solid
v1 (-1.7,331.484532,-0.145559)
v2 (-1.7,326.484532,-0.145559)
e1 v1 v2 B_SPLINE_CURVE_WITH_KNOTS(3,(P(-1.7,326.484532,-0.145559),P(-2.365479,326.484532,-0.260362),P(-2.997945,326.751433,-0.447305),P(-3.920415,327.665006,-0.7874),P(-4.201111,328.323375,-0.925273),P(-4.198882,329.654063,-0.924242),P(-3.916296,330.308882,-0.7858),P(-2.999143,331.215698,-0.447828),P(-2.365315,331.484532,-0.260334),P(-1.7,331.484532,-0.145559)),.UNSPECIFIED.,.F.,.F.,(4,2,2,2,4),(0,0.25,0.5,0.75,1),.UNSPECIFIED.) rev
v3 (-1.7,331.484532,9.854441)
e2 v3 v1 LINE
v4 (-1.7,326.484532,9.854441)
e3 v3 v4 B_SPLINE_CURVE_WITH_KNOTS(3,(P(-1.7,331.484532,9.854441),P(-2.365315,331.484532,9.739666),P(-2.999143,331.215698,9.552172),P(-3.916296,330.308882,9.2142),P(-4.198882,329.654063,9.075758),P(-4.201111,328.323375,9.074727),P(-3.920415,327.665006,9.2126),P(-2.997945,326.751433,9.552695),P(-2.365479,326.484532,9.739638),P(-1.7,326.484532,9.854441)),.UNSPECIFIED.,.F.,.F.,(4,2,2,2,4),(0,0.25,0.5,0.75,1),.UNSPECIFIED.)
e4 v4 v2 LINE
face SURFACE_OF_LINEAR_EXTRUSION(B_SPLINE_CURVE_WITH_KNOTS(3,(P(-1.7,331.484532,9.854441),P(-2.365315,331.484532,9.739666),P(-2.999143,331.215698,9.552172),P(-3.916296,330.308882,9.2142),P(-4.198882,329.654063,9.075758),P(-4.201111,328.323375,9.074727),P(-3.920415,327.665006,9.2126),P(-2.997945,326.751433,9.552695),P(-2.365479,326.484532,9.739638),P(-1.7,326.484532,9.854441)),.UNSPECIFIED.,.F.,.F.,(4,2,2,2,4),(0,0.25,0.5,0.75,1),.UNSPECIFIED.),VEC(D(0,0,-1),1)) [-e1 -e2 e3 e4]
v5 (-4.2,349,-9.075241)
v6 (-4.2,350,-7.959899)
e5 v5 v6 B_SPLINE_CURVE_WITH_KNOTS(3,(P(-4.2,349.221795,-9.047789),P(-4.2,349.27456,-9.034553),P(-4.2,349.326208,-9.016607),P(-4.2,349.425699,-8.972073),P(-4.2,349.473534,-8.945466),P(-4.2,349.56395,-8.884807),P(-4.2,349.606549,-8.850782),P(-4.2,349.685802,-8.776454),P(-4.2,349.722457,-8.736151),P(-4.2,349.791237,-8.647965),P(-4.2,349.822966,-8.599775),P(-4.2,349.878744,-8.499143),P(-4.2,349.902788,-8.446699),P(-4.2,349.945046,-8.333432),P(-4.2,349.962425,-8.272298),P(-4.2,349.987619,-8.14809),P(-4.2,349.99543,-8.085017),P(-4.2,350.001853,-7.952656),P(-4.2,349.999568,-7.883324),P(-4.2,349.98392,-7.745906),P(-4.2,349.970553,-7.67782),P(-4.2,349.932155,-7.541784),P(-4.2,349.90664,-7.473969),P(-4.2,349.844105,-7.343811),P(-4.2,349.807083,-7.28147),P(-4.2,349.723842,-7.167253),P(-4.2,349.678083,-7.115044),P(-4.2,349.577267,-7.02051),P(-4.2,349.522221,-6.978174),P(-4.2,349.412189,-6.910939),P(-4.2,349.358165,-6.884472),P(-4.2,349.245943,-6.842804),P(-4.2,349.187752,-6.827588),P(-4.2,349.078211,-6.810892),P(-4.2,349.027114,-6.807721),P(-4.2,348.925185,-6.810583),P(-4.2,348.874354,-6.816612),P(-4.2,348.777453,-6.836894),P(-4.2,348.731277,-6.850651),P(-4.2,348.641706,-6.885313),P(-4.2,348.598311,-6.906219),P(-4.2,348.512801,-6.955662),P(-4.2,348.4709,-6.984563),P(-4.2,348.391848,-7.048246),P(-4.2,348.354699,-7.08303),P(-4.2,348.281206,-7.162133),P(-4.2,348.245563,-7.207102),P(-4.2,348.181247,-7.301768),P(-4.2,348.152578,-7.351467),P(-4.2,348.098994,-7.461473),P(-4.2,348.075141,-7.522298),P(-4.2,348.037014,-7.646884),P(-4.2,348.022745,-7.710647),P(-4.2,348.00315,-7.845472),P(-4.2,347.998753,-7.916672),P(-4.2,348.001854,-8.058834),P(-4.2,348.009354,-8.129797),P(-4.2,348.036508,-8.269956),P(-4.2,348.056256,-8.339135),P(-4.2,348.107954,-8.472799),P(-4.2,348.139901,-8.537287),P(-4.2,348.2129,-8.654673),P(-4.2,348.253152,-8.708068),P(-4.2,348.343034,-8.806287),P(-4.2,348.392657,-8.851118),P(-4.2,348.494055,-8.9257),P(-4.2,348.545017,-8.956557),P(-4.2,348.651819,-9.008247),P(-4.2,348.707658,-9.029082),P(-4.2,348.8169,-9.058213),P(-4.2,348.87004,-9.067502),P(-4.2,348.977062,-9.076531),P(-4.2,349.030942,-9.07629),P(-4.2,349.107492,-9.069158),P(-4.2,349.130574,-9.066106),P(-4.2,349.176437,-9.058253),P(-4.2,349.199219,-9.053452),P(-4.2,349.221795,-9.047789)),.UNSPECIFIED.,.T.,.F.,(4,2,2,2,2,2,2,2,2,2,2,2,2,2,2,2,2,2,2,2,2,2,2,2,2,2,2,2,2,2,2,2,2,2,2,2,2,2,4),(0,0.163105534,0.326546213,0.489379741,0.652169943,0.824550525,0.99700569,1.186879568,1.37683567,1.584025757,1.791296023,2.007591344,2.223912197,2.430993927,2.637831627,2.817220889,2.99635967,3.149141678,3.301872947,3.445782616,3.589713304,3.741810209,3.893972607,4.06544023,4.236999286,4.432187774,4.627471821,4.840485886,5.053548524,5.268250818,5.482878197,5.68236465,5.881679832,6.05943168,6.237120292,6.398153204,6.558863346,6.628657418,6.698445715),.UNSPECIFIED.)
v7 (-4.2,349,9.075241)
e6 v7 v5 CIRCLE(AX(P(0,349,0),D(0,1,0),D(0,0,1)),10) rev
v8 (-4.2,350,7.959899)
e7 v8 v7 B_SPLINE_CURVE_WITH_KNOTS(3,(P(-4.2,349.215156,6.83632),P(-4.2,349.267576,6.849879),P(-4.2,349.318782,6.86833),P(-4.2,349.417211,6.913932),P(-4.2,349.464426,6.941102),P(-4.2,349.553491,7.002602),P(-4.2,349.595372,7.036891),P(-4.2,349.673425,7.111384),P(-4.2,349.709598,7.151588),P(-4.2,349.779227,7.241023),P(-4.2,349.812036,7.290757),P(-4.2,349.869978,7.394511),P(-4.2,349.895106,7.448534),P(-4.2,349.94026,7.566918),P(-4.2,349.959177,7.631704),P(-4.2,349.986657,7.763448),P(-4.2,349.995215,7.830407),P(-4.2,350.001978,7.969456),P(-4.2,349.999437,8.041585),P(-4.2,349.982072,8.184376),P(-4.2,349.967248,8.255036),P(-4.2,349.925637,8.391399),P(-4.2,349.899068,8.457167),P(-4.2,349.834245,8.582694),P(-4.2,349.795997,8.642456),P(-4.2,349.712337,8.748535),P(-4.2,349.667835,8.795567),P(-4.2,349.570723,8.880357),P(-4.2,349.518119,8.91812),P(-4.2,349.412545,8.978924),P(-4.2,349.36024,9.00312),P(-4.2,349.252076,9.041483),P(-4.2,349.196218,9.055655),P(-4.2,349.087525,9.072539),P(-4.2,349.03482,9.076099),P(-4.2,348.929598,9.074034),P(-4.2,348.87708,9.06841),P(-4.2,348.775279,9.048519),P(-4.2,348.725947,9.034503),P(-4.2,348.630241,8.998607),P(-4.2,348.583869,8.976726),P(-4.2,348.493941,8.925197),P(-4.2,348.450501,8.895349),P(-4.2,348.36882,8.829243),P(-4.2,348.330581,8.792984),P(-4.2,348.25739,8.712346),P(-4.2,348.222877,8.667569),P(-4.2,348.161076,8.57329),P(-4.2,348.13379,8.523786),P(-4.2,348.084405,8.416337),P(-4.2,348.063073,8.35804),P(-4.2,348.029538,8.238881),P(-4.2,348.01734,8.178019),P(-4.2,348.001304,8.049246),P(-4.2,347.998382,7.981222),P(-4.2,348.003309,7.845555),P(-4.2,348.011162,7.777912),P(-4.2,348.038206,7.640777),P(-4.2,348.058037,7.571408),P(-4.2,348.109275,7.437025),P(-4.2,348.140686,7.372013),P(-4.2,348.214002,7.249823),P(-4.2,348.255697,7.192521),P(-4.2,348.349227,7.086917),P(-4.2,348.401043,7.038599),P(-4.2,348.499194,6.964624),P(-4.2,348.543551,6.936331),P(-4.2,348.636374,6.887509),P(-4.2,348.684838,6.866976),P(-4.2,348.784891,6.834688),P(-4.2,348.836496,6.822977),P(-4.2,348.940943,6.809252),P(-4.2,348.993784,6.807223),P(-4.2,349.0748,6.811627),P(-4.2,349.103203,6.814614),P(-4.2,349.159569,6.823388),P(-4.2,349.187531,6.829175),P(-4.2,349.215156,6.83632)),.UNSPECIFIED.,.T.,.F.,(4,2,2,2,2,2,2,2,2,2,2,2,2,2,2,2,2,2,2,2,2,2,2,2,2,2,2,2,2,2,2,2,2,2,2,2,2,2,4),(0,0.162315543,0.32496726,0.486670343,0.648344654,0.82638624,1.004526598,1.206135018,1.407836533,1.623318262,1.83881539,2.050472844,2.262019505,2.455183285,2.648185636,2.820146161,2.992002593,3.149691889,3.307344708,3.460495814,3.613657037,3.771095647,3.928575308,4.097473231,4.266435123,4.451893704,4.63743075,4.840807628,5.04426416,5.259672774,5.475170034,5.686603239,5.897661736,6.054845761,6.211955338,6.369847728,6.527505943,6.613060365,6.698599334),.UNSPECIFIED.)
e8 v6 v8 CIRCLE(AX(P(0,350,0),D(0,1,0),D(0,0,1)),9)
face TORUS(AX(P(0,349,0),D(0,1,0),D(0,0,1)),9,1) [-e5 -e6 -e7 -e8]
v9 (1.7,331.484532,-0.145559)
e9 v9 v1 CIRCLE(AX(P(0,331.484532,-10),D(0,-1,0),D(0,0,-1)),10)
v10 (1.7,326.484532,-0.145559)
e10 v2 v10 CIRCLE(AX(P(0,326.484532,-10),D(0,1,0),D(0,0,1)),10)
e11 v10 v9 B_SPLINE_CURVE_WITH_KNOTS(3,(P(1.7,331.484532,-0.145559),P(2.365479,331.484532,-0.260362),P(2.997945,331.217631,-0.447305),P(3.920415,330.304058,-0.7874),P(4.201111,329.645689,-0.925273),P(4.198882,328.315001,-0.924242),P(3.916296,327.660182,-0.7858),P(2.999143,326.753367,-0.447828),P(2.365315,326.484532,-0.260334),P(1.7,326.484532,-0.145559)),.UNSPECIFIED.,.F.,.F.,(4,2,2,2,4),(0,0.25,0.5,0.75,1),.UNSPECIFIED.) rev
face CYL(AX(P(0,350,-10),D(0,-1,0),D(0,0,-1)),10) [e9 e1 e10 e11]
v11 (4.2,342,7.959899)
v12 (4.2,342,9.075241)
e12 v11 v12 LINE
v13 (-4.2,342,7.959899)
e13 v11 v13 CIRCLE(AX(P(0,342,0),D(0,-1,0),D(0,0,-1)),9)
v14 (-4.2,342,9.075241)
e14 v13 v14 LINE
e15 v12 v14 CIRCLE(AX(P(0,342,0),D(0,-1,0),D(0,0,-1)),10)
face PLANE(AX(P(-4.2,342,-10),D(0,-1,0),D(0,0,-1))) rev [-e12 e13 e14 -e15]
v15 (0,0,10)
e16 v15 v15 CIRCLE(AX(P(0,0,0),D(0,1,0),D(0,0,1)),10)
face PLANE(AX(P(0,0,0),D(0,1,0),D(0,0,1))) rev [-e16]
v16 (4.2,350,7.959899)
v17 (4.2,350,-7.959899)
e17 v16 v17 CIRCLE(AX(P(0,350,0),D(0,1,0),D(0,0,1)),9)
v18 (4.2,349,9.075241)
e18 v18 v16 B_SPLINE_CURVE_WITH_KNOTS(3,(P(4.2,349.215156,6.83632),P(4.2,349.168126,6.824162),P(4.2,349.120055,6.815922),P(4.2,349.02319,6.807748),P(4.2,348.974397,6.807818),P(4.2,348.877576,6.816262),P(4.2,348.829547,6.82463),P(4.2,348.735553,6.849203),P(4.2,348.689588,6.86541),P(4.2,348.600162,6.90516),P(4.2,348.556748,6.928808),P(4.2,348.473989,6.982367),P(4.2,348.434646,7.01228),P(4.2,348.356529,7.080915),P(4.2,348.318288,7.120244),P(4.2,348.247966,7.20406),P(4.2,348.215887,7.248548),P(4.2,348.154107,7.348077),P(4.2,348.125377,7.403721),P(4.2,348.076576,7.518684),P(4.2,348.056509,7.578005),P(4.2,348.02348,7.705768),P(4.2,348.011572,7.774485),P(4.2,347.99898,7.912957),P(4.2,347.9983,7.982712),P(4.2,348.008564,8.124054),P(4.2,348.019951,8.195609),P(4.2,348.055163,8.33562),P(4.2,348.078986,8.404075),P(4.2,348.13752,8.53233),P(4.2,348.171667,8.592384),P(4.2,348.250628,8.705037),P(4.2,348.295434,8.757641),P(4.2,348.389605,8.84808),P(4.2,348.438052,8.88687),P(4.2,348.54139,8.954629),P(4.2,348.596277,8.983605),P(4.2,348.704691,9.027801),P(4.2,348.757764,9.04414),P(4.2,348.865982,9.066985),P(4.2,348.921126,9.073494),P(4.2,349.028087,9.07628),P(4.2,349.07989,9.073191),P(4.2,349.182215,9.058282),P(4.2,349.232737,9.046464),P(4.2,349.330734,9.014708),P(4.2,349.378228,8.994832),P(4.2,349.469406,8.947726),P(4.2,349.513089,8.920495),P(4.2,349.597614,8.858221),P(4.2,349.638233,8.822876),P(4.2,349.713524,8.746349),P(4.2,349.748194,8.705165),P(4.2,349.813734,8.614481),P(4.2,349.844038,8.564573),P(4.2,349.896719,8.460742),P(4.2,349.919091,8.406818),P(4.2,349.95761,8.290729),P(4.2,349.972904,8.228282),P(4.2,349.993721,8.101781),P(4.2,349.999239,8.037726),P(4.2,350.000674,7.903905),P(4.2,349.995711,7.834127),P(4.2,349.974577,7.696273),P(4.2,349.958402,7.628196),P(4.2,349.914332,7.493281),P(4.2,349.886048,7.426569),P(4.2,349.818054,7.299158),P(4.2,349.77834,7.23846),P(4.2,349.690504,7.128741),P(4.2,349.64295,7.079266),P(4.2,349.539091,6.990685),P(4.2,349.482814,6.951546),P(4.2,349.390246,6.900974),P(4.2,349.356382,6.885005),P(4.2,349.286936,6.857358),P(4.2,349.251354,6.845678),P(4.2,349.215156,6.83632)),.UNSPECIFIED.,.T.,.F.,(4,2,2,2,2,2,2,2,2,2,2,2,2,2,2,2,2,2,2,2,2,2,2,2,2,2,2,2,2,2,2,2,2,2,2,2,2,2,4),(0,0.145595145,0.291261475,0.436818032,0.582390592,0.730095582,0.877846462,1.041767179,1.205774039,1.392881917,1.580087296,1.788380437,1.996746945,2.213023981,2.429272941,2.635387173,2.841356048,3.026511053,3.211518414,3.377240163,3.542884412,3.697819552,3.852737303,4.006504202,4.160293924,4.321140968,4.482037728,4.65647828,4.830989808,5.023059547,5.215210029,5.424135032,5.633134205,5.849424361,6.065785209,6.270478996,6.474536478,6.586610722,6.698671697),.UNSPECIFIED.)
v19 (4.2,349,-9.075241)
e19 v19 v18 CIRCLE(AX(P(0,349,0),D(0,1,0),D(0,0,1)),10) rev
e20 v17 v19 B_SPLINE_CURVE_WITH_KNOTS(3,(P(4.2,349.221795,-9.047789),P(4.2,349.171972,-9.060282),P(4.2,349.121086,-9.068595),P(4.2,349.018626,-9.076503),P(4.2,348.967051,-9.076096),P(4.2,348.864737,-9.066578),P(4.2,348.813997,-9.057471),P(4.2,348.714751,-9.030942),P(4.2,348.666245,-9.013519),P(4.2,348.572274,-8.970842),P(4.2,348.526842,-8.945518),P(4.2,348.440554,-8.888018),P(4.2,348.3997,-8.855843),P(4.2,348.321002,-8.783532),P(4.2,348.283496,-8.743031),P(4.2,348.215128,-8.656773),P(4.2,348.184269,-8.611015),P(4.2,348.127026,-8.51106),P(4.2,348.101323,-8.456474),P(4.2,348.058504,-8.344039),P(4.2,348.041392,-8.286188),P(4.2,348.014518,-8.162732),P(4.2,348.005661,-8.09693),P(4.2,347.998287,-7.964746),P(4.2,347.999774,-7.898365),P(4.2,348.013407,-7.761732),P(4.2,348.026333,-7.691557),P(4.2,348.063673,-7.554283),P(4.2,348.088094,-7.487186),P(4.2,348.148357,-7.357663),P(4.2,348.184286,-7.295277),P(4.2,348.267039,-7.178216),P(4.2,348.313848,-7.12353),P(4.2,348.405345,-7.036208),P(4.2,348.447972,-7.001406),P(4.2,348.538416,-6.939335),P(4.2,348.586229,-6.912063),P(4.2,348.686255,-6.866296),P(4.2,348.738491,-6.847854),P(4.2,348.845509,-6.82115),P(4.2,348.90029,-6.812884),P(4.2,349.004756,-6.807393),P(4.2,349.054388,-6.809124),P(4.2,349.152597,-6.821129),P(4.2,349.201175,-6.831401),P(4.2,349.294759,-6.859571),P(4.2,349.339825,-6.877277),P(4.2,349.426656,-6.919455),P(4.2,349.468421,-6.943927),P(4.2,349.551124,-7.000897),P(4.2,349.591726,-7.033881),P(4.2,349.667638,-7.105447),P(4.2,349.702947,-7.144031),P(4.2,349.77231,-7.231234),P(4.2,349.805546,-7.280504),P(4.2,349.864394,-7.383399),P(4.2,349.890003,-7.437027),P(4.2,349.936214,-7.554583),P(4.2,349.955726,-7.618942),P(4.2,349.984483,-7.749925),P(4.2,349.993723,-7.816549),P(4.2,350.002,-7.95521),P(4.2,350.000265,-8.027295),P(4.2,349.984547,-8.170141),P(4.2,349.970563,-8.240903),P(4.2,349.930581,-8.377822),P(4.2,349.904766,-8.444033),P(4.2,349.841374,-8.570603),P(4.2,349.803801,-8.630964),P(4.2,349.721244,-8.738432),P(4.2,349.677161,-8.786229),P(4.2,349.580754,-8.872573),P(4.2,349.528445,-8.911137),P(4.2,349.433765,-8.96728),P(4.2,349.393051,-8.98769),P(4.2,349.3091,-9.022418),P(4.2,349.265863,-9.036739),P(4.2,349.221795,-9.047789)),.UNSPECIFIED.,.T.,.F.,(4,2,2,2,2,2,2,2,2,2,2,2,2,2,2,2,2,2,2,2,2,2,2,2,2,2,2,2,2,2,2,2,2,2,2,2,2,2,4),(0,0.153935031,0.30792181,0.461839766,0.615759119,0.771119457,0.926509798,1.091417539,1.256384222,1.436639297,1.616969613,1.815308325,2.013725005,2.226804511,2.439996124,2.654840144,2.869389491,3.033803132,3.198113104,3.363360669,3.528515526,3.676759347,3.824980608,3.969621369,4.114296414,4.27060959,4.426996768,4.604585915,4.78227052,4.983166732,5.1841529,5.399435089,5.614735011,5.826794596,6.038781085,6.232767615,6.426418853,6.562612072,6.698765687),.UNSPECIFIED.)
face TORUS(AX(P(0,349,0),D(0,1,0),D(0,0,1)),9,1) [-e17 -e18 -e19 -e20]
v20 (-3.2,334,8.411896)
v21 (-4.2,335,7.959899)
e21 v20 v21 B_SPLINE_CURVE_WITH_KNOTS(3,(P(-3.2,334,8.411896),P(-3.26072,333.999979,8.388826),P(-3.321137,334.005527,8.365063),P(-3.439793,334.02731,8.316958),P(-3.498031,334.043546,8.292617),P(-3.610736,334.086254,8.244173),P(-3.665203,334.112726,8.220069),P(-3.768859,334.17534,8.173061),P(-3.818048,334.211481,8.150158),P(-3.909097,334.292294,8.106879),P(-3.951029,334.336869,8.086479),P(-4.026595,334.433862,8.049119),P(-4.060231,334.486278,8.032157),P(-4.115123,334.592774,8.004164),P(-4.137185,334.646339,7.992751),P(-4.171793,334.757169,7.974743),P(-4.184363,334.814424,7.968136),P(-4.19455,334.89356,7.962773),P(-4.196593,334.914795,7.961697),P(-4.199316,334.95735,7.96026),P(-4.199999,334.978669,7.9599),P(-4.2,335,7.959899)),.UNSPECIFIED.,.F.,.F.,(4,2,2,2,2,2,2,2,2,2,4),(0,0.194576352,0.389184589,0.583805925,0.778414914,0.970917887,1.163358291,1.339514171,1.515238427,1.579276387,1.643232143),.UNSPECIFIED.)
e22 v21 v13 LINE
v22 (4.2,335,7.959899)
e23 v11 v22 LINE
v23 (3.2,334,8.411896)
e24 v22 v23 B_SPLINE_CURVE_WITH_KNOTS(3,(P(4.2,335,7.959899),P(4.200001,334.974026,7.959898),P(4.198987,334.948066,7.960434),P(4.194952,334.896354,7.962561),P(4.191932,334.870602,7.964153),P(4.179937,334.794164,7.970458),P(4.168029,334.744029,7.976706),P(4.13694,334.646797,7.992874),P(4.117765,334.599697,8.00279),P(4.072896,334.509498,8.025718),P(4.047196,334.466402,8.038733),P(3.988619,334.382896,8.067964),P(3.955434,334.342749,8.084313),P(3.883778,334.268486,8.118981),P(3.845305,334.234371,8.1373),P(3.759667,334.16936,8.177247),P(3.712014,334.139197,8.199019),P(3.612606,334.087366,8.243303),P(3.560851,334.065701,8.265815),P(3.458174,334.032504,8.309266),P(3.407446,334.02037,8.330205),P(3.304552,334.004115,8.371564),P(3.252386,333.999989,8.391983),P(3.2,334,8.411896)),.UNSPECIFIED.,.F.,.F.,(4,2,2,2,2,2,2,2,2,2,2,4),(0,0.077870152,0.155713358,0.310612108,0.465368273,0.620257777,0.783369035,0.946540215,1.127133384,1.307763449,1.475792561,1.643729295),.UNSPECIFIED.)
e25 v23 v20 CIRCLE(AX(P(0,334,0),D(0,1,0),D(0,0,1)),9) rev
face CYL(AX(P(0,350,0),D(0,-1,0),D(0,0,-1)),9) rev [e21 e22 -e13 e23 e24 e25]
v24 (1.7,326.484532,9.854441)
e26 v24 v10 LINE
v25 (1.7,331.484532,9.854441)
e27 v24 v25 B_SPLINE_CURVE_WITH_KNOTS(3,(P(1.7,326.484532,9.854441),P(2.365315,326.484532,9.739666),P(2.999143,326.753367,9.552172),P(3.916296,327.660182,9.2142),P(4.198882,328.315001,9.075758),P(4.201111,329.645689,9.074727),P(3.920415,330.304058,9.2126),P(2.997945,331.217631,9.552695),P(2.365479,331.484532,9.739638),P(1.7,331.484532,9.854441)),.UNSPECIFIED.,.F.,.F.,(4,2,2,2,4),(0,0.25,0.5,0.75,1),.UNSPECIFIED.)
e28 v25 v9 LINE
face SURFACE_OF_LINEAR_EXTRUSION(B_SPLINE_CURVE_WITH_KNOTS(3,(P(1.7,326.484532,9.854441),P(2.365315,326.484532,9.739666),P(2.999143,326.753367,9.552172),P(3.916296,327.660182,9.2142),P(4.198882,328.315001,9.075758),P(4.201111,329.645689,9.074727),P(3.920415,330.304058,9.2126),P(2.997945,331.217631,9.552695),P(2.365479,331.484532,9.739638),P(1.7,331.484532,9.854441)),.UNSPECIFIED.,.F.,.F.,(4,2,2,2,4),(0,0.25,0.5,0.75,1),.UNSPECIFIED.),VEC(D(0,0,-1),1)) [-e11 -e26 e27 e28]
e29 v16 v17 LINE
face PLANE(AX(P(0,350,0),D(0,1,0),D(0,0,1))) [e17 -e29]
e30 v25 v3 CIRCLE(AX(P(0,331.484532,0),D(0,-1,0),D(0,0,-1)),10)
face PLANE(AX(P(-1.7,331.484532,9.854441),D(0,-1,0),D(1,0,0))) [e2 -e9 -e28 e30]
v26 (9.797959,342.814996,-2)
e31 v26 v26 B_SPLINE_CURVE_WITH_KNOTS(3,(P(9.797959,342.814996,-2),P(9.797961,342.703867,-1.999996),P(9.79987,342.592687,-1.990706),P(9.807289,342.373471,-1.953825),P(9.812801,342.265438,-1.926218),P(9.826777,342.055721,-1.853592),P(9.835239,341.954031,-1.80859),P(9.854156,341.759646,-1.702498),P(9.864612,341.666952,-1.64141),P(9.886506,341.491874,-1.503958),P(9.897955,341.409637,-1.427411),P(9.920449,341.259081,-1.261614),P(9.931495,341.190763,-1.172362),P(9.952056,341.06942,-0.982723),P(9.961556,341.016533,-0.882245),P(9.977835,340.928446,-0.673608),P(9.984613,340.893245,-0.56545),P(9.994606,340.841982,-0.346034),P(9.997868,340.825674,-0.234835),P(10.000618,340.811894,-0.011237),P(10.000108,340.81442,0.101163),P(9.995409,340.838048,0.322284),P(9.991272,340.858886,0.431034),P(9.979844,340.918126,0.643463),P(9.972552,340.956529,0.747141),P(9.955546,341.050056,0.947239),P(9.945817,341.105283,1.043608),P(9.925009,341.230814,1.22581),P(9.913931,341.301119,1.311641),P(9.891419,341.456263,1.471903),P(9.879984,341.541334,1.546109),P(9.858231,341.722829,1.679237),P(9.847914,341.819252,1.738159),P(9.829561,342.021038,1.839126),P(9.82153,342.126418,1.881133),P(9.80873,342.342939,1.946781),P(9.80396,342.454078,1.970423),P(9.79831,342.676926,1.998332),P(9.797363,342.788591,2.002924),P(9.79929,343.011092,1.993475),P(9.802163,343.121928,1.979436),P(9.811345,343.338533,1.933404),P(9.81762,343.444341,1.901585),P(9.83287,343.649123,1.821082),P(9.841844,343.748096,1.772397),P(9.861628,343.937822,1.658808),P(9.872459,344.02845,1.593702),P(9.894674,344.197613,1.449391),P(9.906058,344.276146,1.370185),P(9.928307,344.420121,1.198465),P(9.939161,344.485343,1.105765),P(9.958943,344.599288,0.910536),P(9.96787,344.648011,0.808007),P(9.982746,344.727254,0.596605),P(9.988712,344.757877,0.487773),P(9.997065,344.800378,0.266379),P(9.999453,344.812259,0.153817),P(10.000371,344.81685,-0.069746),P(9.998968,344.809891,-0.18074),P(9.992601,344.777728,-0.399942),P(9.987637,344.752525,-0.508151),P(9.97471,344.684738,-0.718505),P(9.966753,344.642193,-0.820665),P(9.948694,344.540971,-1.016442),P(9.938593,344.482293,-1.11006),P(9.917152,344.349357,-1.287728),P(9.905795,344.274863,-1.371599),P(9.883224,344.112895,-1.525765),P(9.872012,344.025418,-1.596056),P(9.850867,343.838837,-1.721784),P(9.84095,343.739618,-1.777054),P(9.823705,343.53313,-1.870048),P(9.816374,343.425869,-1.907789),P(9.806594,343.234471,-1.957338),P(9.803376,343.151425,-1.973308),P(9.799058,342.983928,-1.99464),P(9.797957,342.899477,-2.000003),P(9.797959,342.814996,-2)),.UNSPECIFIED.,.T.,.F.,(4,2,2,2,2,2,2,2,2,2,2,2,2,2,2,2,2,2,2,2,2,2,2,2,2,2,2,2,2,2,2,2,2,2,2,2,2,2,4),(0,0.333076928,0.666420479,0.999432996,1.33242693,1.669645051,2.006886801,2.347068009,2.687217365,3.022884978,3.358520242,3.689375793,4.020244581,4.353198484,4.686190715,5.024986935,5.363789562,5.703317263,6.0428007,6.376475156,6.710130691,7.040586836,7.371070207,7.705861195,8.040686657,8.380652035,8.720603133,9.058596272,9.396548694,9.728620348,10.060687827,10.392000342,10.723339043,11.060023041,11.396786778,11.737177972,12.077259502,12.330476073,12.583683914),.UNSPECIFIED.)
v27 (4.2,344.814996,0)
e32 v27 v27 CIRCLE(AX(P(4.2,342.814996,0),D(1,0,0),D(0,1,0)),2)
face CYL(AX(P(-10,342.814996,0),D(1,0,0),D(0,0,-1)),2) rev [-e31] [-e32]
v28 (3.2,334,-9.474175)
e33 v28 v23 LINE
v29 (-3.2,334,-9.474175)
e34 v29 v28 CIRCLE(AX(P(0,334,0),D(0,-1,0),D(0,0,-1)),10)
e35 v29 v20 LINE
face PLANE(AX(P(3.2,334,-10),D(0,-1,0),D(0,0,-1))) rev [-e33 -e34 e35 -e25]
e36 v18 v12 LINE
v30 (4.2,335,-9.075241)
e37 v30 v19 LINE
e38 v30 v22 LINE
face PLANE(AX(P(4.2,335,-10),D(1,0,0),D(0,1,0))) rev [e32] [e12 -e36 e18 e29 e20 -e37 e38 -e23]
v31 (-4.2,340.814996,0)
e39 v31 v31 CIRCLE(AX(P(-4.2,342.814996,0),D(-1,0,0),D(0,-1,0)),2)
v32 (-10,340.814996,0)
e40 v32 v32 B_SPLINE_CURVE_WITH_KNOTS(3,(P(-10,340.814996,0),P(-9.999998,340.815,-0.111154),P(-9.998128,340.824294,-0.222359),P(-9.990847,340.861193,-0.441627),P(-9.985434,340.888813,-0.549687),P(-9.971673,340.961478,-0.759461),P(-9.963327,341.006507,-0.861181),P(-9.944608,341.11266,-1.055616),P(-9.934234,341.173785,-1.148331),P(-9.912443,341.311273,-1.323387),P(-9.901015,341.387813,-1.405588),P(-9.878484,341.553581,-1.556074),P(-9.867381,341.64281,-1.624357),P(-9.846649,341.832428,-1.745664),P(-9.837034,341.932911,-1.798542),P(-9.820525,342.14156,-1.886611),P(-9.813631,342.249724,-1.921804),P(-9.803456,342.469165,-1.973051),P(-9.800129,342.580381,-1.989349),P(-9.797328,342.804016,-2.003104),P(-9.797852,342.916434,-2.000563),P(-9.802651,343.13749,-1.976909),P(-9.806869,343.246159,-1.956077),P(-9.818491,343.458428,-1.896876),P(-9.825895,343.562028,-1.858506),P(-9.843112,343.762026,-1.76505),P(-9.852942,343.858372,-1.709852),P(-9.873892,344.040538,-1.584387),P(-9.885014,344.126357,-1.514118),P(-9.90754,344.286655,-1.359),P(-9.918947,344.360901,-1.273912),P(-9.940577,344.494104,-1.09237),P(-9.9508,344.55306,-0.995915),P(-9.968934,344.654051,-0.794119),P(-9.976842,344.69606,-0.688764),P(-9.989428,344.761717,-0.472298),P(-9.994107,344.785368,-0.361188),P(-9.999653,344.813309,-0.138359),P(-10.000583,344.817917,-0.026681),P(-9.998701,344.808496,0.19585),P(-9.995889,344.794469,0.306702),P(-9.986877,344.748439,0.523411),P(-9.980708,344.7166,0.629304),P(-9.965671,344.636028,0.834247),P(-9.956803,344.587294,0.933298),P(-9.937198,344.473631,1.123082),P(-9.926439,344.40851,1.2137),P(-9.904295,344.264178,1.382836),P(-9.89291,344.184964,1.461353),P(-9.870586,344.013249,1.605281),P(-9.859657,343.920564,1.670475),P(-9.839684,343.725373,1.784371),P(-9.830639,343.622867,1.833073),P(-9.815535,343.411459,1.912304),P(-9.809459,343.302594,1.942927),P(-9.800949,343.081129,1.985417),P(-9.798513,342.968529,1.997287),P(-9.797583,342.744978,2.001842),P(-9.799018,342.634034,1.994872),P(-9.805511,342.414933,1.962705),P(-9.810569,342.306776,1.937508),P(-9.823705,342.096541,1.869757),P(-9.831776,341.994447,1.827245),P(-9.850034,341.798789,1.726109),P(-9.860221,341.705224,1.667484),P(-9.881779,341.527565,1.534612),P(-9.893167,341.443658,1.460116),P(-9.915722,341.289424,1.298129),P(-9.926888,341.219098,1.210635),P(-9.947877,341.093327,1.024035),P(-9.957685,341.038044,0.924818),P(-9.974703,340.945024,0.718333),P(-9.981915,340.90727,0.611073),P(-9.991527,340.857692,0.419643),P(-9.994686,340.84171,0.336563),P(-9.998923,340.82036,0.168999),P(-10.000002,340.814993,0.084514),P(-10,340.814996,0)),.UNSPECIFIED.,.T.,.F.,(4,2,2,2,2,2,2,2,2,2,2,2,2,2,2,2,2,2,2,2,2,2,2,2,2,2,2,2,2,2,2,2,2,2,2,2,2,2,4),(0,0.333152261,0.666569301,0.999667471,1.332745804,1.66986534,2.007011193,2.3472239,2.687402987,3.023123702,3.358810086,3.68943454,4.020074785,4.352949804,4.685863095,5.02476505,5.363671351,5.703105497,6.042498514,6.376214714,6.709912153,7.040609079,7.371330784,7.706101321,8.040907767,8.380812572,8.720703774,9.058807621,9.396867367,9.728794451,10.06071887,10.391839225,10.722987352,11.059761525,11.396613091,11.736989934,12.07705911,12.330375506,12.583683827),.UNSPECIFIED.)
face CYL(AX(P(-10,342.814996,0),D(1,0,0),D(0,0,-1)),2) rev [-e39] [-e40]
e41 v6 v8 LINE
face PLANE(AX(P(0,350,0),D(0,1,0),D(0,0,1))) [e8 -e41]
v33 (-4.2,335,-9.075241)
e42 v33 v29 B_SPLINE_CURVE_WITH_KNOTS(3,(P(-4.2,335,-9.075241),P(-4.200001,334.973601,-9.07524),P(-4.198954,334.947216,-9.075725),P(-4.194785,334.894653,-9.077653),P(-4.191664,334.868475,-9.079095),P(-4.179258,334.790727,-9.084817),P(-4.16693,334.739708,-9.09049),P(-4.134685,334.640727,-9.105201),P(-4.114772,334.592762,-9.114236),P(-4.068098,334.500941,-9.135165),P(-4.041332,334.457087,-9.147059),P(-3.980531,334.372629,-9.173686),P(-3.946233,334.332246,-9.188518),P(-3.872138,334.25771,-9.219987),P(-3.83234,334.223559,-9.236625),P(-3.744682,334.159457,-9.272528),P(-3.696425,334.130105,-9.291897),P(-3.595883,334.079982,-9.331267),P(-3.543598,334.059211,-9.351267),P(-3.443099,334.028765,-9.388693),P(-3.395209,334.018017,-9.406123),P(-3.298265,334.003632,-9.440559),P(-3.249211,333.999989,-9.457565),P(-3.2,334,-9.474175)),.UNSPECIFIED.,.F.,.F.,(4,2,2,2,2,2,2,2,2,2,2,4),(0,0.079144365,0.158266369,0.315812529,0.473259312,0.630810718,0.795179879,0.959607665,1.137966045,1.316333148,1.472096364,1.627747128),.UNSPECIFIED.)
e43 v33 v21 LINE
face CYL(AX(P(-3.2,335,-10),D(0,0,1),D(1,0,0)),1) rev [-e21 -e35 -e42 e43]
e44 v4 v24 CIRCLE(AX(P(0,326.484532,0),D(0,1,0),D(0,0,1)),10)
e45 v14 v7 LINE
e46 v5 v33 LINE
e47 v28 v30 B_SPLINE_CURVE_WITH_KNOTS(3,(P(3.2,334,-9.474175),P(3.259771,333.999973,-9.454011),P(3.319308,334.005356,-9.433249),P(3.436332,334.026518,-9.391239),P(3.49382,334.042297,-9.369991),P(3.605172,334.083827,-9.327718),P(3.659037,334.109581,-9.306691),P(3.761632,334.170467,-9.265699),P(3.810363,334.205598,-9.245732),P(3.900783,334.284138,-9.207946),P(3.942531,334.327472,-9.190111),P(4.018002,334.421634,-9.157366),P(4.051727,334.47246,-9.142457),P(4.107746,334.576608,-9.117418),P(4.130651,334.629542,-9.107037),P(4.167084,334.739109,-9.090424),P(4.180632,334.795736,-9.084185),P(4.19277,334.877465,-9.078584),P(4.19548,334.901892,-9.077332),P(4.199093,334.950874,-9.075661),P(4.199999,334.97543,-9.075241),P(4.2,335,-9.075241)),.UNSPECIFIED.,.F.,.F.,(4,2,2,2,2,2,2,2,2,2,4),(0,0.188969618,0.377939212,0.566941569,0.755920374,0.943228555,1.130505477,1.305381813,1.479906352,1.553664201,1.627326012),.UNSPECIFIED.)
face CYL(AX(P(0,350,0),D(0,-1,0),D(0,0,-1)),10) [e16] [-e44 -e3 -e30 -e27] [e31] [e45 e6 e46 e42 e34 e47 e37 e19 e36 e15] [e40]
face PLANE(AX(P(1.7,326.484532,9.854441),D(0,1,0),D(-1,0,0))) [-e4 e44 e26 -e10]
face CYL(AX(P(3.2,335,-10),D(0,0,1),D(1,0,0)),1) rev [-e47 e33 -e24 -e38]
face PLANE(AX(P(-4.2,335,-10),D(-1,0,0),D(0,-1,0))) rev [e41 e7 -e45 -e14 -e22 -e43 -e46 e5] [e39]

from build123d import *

# Parameters (mm, degrees)
SKETCH_1_R                           = 10
EXTRUDE_1_DEPTH                      = 350
FILLET_1_R                           = 1
CUT_EXTRUDE_6_DEPTH                  = 351.285597766
CUT_EXTRUDE_6_DIRECTION_2_REACH      = 352.286
CUT_EXTRUDE_6_DIRECTION_2_END_RADIUS = 9
CUT_EXTRUDE_7_DEPTH                  = 351.285597868
CUT_EXTRUDE_7_DEPTH_BACK             = 351.285597868
SKETCH_7_W                           = 8.4
SKETCH_7_H                           = 16
CUT_EXTRUDE_START                    = -0.924758876
CUT_EXTRUDE_8_DEPTH                  = 11.924758876
CUT_EXTRUDE_START_2                  = 325
CUT_EXTRUDE_8_2_DEPTH                = 7
CUT_EXTRUDE_9_DEPTH                  = 351.285597868
CUT_EXTRUDE_9_DEPTH_BACK             = 351.285597868
SKETCH_9_R                           = 2


with BuildPart() as part:
    # 草图1 → 凸台-拉伸1 (new body)
    with BuildSketch(Plane(origin=(0, 0, 0), x_dir=(1, 0, 0), z_dir=(0, 1, 0))):
        with Locations(Location((0, 0, 0), (0, 0, 270))):
            Circle(SKETCH_1_R)
    extrude(amount=EXTRUDE_1_DEPTH)

    # 圆角1
    fillet_1_edges = [part.edges().sort_by_distance(p)[0] for p in [
        (0, 350, -10),
    ]]
    fillet(fillet_1_edges, radius=FILLET_1_R)

    # 草图5 → 切除-拉伸6 (cut)
    with BuildSketch(Plane.XY):
        with BuildLine():
            Line((3.2, 334), (-3.2, 334))
            ThreePointArc((-3.2, 334), (-3.907106781, 334.292893219), (-4.2, 335))
            Line((-4.2, 335), (-4.2, 366))
            Line((-4.2, 366), (4.2, 366))
            Line((4.2, 366), (4.2, 335))
            ThreePointArc((4.2, 335), (3.907106781, 334.292893219), (3.2, 334))
        make_face()
    extrude(amount=-CUT_EXTRUDE_6_DEPTH, mode=Mode.SUBTRACT)

    # 切除-拉伸6 direction 2: up to this cylinder (the profile starts inside it)
    cut_extrude_6_direction_2_end = Plane(origin=(0, 350.025231, 0), z_dir=(0, -1, 0)) * Cylinder(CUT_EXTRUDE_6_DIRECTION_2_END_RADIUS, 723.572, mode=Mode.PRIVATE)
    # 草图5 → 切除-拉伸6 direction 2 (cut, up to the surface)
    with BuildSketch(Plane.XY, mode=Mode.PRIVATE) as cut_extrude_6_direction_2_sk1:
        with BuildLine():
            Line((3.2, 334), (-3.2, 334))
            ThreePointArc((-3.2, 334), (-3.907106781, 334.292893219), (-4.2, 335))
            Line((-4.2, 335), (-4.2, 366))
            Line((-4.2, 366), (4.2, 366))
            Line((4.2, 366), (4.2, 335))
            ThreePointArc((4.2, 335), (3.907106781, 334.292893219), (3.2, 334))
        make_face()
    cut_extrude_6_direction_2_tool1 = extrude(cut_extrude_6_direction_2_sk1.sketch, amount=CUT_EXTRUDE_6_DIRECTION_2_REACH, mode=Mode.PRIVATE) & cut_extrude_6_direction_2_end
    add(cut_extrude_6_direction_2_tool1.solids().sort_by_distance((0, 350.025231, 0))[0], mode=Mode.SUBTRACT)

    # 草图7 → 切除-拉伸7 (cut, two sides: drawn at the far end of the back side and taken through both)
    with BuildSketch(Plane.XY.offset(-CUT_EXTRUDE_7_DEPTH_BACK)):
        with Locations((0, 350)):
            Rectangle(SKETCH_7_W, SKETCH_7_H)
    extrude(amount=CUT_EXTRUDE_7_DEPTH + CUT_EXTRUDE_7_DEPTH_BACK, mode=Mode.SUBTRACT)

    # 切除-拉伸8: read off the stored shape, not the designer's step
    # 切除-拉伸8 outline → 切除-拉伸8 (cut)
    with BuildSketch(Plane.XY.offset(CUT_EXTRUDE_START)):
        with BuildLine():
            Line((1.7, 331.484532172), (-1.7, 331.484532172))
            add(Edge.make_bspline(
                [(-1.7, 331.484532172), (-2.36531519, 331.484532172), (-2.999142714, 331.215697613), (-3.916295952, 330.308882303), (-4.198882198, 329.654063239), (-4.20111079, 328.323374921), (-3.920415307, 327.665006461), (-2.997944529, 326.751432928), (-2.365478889, 326.484532172), (-1.7, 326.484532172)],
                knots=[0, 0, 0, 0, 0.25, 0.25, 0.5, 0.5, 0.75, 0.75, 1, 1, 1, 1], degree=3))
            Line((-1.7, 326.484532172), (1.7, 326.484532172))
            add(Edge.make_bspline(
                [(1.7, 326.484532172), (2.36531519, 326.484532172), (2.999142714, 326.75336673), (3.916295952, 327.66018204), (4.198882198, 328.315001104), (4.20111079, 329.645689422), (3.920415307, 330.304057882), (2.997944529, 331.217631415), (2.365478889, 331.484532172), (1.7, 331.484532172)],
                knots=[0, 0, 0, 0, 0.25, 0.25, 0.5, 0.5, 0.75, 0.75, 1, 1, 1, 1], degree=3))
        make_face()
    extrude(amount=CUT_EXTRUDE_8_DEPTH, mode=Mode.SUBTRACT)

    # Cut-Extrude 8 2 outline → Cut-Extrude 8 2 (add)
    with BuildSketch(Plane(origin=(0, 0, 0), x_dir=(1, 0, 0), z_dir=(0, 1, 0)).offset(CUT_EXTRUDE_START_2)):
        with BuildLine():
            ThreePointArc((-4.199999886, 0.924758903), (0, 0), (4.199999886, 0.924758903))
            Line((4.199999886, 0.924758903), (-4.199999886, 0.924758903))
        make_face()
    extrude(amount=CUT_EXTRUDE_8_2_DEPTH)

    # 草图9 → 切除-拉伸9 (cut, two sides: drawn at the far end of the back side and taken through both)
    with BuildSketch(Plane(origin=(0, 0, 0), x_dir=(0, 0, -1), z_dir=(1, 0, 0)).offset(-CUT_EXTRUDE_9_DEPTH_BACK)):
        with Locations((0, 342.814995951)):
            Circle(SKETCH_9_R)
    extrude(amount=CUT_EXTRUDE_9_DEPTH + CUT_EXTRUDE_9_DEPTH_BACK, mode=Mode.SUBTRACT)


solid = part.part
